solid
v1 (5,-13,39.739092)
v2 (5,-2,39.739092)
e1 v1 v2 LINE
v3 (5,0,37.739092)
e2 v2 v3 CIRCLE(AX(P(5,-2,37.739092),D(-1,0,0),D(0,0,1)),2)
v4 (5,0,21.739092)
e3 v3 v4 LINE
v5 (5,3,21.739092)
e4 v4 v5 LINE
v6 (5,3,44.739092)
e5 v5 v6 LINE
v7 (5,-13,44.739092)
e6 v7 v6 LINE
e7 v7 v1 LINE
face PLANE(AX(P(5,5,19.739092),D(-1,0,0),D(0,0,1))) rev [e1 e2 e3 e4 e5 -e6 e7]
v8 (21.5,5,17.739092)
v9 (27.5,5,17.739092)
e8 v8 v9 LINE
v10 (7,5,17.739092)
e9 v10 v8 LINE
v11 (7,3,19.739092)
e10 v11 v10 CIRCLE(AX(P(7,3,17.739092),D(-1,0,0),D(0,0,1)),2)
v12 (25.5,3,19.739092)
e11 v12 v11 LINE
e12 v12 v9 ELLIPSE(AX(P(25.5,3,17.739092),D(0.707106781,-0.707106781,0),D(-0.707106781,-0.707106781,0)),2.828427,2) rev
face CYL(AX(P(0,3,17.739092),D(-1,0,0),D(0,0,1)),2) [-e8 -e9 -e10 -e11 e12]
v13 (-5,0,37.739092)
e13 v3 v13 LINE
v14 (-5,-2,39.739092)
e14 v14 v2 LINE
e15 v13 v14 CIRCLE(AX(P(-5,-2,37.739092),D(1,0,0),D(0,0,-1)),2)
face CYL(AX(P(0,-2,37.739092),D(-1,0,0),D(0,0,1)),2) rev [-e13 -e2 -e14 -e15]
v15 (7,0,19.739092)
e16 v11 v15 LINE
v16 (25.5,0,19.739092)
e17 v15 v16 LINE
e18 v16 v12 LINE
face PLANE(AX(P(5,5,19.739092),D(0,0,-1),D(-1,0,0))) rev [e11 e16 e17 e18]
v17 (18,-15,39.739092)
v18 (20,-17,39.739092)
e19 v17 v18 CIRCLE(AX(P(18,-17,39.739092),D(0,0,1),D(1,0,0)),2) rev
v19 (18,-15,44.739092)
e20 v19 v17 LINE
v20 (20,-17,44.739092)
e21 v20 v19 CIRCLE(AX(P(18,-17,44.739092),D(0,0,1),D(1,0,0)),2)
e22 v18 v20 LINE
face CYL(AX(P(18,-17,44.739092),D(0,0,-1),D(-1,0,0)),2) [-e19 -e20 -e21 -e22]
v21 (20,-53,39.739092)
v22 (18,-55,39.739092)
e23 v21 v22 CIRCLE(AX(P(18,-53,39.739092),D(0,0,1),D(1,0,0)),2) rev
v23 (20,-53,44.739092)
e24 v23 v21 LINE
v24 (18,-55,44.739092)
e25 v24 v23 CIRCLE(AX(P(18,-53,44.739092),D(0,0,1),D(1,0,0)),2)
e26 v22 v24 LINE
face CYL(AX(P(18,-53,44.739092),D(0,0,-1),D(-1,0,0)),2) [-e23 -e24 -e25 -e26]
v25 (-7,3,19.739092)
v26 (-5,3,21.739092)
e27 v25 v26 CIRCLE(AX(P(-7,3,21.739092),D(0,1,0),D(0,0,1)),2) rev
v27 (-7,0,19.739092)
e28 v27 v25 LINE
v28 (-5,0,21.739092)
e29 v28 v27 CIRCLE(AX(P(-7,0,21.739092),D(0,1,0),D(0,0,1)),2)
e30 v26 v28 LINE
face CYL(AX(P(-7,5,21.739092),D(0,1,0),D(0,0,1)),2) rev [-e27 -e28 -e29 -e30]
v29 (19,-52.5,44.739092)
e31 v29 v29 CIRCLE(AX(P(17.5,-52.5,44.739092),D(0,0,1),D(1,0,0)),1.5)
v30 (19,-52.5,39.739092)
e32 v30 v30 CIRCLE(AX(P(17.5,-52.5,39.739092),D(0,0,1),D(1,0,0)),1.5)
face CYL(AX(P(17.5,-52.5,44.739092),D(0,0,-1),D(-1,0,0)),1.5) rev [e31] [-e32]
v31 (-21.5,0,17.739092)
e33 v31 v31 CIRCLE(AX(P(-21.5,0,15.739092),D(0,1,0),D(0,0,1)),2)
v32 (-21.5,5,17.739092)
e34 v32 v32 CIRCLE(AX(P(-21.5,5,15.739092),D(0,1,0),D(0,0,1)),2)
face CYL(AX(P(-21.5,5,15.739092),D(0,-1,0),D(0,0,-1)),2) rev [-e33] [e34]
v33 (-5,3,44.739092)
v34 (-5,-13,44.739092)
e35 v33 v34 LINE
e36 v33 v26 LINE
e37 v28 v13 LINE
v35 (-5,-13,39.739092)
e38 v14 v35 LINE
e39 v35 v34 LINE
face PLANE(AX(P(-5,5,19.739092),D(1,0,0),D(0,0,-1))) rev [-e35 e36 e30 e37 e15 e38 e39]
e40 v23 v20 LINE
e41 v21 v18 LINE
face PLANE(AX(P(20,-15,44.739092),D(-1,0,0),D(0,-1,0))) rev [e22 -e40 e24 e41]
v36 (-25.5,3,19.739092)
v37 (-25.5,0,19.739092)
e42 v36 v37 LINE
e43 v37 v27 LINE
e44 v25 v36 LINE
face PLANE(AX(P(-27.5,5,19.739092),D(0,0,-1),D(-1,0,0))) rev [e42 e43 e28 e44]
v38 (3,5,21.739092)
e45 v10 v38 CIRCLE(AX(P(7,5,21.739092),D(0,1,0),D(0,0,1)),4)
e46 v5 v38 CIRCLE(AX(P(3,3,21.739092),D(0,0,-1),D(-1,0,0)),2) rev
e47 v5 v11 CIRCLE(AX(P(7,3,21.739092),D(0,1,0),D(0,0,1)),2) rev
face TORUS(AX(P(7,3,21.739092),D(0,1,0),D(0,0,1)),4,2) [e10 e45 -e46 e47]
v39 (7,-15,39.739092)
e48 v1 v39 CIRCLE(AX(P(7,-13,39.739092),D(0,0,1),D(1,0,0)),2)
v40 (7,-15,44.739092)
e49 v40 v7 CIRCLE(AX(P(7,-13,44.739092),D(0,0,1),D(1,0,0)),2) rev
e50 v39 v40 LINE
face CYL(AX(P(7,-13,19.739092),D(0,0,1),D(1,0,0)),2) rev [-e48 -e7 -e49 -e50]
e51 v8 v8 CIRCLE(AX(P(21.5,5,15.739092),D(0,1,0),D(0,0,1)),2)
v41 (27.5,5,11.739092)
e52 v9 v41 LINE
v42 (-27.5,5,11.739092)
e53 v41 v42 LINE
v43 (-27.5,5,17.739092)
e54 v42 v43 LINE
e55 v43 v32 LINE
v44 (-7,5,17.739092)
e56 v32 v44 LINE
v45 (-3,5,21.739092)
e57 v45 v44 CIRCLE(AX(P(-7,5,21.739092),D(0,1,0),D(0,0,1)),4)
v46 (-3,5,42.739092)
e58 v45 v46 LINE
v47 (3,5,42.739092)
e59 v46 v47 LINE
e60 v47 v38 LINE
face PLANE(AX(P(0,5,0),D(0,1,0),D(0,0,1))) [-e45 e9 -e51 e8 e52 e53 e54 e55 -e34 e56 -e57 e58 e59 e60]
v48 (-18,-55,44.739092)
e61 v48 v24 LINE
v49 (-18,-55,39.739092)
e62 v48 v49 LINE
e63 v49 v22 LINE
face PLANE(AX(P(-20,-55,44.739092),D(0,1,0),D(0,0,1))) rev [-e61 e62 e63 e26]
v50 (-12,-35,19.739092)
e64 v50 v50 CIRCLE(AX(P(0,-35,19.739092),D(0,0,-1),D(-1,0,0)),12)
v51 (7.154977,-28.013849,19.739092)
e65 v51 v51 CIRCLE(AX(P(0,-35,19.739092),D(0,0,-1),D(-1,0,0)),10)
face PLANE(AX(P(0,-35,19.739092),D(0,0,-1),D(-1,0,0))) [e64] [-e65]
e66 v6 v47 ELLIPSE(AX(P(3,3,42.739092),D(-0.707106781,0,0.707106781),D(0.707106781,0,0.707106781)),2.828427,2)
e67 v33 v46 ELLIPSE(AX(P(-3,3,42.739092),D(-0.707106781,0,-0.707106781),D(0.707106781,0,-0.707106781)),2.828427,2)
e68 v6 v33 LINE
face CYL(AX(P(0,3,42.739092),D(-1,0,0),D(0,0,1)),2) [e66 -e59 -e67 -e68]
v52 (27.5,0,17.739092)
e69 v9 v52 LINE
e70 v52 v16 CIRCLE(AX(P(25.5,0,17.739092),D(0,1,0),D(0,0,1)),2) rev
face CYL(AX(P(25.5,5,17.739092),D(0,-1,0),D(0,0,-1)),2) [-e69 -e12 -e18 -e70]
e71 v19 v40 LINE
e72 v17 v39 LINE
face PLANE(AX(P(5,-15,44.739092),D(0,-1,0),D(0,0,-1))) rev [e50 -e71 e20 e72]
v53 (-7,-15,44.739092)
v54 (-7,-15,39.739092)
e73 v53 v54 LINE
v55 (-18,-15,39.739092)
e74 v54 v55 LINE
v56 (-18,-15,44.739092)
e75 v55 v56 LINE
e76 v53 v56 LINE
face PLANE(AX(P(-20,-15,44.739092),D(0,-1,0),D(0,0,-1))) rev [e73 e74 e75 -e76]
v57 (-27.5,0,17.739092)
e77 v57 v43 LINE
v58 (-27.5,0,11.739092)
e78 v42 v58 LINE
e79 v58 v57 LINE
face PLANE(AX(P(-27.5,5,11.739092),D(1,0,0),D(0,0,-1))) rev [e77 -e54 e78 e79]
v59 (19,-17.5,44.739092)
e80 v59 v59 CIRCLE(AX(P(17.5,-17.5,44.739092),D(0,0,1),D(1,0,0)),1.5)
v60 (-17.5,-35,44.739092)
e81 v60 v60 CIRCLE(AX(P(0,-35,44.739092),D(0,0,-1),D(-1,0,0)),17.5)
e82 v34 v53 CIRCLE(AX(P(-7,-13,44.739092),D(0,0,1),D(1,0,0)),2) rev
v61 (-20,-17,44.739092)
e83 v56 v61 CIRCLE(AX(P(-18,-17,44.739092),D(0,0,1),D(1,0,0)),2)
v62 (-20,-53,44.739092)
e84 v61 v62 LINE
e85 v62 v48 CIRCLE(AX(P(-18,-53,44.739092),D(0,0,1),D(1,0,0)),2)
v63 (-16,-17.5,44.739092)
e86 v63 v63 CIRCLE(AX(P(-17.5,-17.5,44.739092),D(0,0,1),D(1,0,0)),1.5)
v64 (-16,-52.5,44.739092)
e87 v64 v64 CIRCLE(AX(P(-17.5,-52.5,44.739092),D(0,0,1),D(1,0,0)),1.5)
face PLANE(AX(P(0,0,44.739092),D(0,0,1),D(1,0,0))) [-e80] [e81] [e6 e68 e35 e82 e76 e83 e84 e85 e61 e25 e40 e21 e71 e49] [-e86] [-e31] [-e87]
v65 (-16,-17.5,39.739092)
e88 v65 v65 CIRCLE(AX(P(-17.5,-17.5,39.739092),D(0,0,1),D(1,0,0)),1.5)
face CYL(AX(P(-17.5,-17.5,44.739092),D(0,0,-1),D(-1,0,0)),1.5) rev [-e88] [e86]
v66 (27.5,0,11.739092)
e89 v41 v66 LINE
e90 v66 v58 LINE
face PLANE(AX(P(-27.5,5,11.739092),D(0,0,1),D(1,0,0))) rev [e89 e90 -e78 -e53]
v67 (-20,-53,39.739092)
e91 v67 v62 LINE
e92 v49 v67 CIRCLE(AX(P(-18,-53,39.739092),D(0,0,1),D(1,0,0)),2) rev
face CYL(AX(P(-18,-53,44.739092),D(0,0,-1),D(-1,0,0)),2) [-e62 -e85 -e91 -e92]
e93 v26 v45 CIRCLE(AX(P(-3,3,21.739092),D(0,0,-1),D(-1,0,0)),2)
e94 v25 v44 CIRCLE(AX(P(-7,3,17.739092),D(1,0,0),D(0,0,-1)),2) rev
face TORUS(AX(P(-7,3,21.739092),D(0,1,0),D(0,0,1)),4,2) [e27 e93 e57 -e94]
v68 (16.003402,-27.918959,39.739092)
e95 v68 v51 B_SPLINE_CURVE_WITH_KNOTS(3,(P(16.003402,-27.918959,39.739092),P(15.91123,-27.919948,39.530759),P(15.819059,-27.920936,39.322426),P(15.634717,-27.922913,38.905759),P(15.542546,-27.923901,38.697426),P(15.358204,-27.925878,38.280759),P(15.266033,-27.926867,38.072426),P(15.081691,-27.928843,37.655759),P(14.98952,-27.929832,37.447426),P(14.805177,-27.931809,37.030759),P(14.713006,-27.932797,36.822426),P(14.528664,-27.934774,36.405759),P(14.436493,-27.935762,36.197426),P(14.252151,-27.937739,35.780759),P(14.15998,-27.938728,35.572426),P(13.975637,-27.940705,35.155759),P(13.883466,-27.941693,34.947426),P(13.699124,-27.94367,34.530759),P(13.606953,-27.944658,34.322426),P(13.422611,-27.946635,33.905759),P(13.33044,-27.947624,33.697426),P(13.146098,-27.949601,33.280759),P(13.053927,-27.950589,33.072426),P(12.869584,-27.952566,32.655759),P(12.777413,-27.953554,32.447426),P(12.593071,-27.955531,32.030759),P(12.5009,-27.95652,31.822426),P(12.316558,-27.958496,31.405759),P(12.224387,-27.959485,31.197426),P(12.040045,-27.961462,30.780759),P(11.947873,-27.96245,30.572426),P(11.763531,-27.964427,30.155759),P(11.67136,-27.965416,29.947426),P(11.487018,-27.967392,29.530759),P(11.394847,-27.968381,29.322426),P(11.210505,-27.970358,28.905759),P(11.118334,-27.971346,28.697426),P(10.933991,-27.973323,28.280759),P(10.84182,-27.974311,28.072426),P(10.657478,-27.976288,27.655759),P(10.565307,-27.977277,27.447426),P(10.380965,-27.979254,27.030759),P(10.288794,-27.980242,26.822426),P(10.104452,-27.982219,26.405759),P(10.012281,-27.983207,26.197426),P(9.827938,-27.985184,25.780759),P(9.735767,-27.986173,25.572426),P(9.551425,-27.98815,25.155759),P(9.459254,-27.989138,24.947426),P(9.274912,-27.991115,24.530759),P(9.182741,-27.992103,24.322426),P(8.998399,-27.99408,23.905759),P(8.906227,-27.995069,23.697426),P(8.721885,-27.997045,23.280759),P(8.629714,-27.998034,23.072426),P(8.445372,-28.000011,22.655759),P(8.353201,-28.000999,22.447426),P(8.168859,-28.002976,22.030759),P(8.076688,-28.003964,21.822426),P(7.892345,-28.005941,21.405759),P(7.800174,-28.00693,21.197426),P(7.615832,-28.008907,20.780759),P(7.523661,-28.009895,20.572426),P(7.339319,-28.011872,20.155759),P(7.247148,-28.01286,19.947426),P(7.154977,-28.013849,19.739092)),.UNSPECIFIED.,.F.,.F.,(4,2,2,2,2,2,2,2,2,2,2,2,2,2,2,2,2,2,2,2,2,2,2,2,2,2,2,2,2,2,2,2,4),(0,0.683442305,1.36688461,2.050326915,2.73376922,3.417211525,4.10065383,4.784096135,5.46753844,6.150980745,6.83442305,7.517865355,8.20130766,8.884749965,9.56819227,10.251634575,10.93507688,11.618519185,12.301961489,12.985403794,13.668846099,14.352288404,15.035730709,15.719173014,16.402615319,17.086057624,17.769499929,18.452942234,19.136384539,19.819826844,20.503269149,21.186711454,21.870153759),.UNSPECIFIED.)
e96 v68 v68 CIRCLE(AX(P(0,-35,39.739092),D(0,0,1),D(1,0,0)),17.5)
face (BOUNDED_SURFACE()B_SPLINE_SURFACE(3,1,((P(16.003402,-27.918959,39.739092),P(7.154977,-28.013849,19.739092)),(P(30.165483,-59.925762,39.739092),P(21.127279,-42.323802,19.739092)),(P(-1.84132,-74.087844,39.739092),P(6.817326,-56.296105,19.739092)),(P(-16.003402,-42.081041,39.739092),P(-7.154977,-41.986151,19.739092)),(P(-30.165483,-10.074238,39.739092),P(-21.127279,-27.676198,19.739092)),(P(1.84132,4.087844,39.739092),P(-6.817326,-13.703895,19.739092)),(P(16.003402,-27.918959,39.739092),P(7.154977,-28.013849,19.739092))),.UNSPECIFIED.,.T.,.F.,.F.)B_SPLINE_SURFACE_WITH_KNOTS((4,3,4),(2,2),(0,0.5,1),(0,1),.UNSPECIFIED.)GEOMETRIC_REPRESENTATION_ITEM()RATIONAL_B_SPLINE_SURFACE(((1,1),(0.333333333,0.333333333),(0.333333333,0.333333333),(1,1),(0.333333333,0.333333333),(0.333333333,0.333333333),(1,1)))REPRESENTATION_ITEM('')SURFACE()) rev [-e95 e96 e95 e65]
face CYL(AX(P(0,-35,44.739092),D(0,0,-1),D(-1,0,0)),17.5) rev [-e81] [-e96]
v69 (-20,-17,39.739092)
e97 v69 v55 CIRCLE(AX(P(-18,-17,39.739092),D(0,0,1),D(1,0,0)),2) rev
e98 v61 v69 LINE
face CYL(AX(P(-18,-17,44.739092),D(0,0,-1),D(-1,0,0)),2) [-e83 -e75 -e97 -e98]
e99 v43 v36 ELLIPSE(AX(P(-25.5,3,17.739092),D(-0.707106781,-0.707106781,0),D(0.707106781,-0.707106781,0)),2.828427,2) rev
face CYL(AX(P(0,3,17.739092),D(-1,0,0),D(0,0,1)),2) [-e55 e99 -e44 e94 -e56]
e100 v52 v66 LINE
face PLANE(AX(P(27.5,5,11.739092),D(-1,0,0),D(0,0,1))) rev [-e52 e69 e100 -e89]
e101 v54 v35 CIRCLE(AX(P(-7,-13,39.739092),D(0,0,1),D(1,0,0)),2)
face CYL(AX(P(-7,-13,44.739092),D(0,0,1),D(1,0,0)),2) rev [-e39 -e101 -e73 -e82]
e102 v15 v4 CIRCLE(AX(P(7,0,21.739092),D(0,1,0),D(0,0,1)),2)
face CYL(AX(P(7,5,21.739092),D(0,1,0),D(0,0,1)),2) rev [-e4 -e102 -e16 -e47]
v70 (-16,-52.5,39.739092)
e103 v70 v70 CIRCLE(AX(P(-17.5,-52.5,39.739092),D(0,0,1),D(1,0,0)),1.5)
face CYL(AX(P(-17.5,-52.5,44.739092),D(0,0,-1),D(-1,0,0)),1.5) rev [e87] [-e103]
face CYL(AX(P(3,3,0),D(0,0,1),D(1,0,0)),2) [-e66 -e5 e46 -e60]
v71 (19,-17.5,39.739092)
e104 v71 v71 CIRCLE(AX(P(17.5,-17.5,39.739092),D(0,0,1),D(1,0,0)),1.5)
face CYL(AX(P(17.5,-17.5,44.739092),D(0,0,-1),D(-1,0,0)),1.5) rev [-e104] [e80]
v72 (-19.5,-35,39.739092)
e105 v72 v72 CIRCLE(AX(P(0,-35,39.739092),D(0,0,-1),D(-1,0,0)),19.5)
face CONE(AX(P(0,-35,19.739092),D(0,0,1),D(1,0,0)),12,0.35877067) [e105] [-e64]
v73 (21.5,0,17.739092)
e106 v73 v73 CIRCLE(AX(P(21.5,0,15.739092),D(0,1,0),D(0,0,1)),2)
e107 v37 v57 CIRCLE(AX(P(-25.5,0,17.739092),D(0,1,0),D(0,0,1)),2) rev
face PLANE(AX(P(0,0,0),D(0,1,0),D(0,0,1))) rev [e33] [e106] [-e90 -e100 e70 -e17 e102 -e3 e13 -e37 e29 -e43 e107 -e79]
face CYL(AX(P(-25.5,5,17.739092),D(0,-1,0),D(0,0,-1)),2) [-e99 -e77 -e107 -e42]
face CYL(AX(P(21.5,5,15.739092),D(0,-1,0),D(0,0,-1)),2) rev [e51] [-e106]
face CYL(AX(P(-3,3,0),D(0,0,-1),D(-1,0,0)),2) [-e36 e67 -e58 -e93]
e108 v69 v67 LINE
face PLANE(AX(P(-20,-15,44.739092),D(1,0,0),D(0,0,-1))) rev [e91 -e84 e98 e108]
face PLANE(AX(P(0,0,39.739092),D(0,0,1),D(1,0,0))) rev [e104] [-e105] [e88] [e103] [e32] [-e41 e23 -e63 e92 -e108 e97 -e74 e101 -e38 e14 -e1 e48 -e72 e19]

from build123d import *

# Parameters (mm, degrees)
ESQUISSE2_R             = 2
BOSS_EXTRU_1_DEPTH      = 5
ESQUISSE3_R             = 1.5
BOSS_EXTRU_2_DEPTH      = 5
ESQUISSE5_R             = 17.5
ENL_V_MAT_EXTRU_1_DEPTH = 68.566633777
ESQUISSE7_R             = 19.5
ESQUISSE8_R             = 12
CONG_2_R                = 2


with BuildPart() as part:
    # Esquisse2 → Boss.-Extru.1 (new body)
    with BuildSketch(Plane(origin=(0, 0, 0), x_dir=(1, 0, 0), z_dir=(0, 1, 0))):
        Polygon((5, -19.739092363), (27.5, -19.739092363), (27.5, -11.739092363), (-27.5, -11.739092363), (-27.5, -19.739092363), (-5, -19.739092363), (-5, -39.739092363), (5, -39.739092363), align=None)
        with Locations(Location((-21.5, -15.739092363, 0), (0, 0, 270))):
            Circle(ESQUISSE2_R, mode=Mode.SUBTRACT)
        with Locations(Location((21.5, -15.739092363, 0), (0, 0, 270))):
            Circle(ESQUISSE2_R, mode=Mode.SUBTRACT)
    extrude(amount=BOSS_EXTRU_1_DEPTH)

    # Esquisse3 → Boss.-Extru.2 (add)
    with BuildSketch(Plane.XY.offset(39.739092363)):
        Polygon((-5, 5), (5, 5), (5, -15), (20, -15), (20, -55), (-20, -55), (-20, -15), (-5, -15), align=None)
        with Locations((-17.5, -17.5)):
            Circle(ESQUISSE3_R, mode=Mode.SUBTRACT)
        with Locations((17.5, -17.5)):
            Circle(ESQUISSE3_R, mode=Mode.SUBTRACT)
        with Locations((17.5, -52.5)):
            Circle(ESQUISSE3_R, mode=Mode.SUBTRACT)
        with Locations((-17.5, -52.5)):
            Circle(ESQUISSE3_R, mode=Mode.SUBTRACT)
    extrude(amount=BOSS_EXTRU_2_DEPTH)

    # Esquisse5 → Enlèv. mat.-Extru.1 (cut, through all)
    with BuildSketch(Plane(origin=(0, 0, 39.739092363), x_dir=(-1, 0, 0), z_dir=(0, 0, -1))):
        with Locations((0, -35)):
            Circle(ESQUISSE5_R)
    extrude(amount=-ENL_V_MAT_EXTRU_1_DEPTH, mode=Mode.SUBTRACT)

    # Esquisse7 → Lissage3 section 0
    with BuildSketch(Plane(origin=(0, 0, 39.739092363), x_dir=(-1, 0, 0), z_dir=(0, 0, -1))):
        with Locations((0, -35)):
            Circle(ESQUISSE7_R)
    # Esquisse8 → Lissage3 section 1
    with BuildSketch(Plane(origin=(0, 0, 19.739092363), x_dir=(-1, 0, 0), z_dir=(0, 0, -1))):
        with Locations((0, -35)):
            Circle(ESQUISSE8_R)
    loft()

    # Enlèvement de matière-Lissage1: read off the stored shape, not the designer's step
    # Enlèvement de matière-Lissage1: loft between two sections, ruled curve by curve
    enl_vement_de_mati_re_lissage1_from = [
        Edge.make_bspline([(16.003401512, -27.918959112, 39.739092363), (30.165483288, -59.925762135, 39.739092363), (-1.841319736, -74.087843911, 39.739092363), (-16.003401512, -42.081040888, 39.739092363), (-30.165483288, -10.074237865, 39.739092363), (1.841319736, 4.087843911, 39.739092363), (16.003401512, -27.918959112, 39.739092363)], [0, 0, 0, 0, 0.5, 0.5, 0.5, 1, 1, 1, 1], 3, [1, 0.333333333, 0.333333333, 1, 0.333333333, 0.333333333, 1]),
    ]
    enl_vement_de_mati_re_lissage1_to = [
        Edge.make_bspline([(7.154976715, -28.013848827, 19.739092363), (21.127279061, -42.323802256, 19.739092363), (6.817325632, -56.296104602, 19.739092363), (-7.154976715, -41.986151173, 19.739092363), (-21.127279061, -27.676197744, 19.739092363), (-6.817325632, -13.703895398, 19.739092363), (7.154976715, -28.013848827, 19.739092363)], [0, 0, 0, 0, 0.5, 0.5, 0.5, 1, 1, 1, 1], 3, [1, 0.333333333, 0.333333333, 1, 0.333333333, 0.333333333, 1]),
    ]
    enl_vement_de_mati_re_lissage1 = Solid(Shell([*[Face.make_surface_from_curves(enl_vement_de_mati_re_lissage1_from[k], enl_vement_de_mati_re_lissage1_to[k]) for k in range(1)], Face(Wire(enl_vement_de_mati_re_lissage1_from)), Face(Wire(enl_vement_de_mati_re_lissage1_to))]))
    add(enl_vement_de_mati_re_lissage1, mode=Mode.SUBTRACT)

    # Congé2
    cong_2_edges = [part.edges().sort_by_distance(p)[0] for p in [
        (-20, -15, 42.239092363),
        (-20, -55, 42.239092363),
        (20, -55, 42.239092363),
        (20, -15, 42.239092363),
        (-5, 5, 32.239092363),
        (5, 5, 32.239092363),
        (5, -15, 42.239092363),
        (-5, -15, 42.239092363),
        (-16.25, 5, 19.739092363),
        (16.25, 5, 19.739092363),
        (0, 5, 44.739092363),
        (27.5, 2.5, 19.739092363),
        (-27.5, 2.5, 19.739092363),
        (-5, 2.5, 19.739092363),
        (5, 2.5, 19.739092363),
        (0, 0, 39.739092363),
    ]]
    fillet(cong_2_edges, radius=CONG_2_R - 0.0001)  # a hair under: the kernel refuses the full size


solid = part.part
